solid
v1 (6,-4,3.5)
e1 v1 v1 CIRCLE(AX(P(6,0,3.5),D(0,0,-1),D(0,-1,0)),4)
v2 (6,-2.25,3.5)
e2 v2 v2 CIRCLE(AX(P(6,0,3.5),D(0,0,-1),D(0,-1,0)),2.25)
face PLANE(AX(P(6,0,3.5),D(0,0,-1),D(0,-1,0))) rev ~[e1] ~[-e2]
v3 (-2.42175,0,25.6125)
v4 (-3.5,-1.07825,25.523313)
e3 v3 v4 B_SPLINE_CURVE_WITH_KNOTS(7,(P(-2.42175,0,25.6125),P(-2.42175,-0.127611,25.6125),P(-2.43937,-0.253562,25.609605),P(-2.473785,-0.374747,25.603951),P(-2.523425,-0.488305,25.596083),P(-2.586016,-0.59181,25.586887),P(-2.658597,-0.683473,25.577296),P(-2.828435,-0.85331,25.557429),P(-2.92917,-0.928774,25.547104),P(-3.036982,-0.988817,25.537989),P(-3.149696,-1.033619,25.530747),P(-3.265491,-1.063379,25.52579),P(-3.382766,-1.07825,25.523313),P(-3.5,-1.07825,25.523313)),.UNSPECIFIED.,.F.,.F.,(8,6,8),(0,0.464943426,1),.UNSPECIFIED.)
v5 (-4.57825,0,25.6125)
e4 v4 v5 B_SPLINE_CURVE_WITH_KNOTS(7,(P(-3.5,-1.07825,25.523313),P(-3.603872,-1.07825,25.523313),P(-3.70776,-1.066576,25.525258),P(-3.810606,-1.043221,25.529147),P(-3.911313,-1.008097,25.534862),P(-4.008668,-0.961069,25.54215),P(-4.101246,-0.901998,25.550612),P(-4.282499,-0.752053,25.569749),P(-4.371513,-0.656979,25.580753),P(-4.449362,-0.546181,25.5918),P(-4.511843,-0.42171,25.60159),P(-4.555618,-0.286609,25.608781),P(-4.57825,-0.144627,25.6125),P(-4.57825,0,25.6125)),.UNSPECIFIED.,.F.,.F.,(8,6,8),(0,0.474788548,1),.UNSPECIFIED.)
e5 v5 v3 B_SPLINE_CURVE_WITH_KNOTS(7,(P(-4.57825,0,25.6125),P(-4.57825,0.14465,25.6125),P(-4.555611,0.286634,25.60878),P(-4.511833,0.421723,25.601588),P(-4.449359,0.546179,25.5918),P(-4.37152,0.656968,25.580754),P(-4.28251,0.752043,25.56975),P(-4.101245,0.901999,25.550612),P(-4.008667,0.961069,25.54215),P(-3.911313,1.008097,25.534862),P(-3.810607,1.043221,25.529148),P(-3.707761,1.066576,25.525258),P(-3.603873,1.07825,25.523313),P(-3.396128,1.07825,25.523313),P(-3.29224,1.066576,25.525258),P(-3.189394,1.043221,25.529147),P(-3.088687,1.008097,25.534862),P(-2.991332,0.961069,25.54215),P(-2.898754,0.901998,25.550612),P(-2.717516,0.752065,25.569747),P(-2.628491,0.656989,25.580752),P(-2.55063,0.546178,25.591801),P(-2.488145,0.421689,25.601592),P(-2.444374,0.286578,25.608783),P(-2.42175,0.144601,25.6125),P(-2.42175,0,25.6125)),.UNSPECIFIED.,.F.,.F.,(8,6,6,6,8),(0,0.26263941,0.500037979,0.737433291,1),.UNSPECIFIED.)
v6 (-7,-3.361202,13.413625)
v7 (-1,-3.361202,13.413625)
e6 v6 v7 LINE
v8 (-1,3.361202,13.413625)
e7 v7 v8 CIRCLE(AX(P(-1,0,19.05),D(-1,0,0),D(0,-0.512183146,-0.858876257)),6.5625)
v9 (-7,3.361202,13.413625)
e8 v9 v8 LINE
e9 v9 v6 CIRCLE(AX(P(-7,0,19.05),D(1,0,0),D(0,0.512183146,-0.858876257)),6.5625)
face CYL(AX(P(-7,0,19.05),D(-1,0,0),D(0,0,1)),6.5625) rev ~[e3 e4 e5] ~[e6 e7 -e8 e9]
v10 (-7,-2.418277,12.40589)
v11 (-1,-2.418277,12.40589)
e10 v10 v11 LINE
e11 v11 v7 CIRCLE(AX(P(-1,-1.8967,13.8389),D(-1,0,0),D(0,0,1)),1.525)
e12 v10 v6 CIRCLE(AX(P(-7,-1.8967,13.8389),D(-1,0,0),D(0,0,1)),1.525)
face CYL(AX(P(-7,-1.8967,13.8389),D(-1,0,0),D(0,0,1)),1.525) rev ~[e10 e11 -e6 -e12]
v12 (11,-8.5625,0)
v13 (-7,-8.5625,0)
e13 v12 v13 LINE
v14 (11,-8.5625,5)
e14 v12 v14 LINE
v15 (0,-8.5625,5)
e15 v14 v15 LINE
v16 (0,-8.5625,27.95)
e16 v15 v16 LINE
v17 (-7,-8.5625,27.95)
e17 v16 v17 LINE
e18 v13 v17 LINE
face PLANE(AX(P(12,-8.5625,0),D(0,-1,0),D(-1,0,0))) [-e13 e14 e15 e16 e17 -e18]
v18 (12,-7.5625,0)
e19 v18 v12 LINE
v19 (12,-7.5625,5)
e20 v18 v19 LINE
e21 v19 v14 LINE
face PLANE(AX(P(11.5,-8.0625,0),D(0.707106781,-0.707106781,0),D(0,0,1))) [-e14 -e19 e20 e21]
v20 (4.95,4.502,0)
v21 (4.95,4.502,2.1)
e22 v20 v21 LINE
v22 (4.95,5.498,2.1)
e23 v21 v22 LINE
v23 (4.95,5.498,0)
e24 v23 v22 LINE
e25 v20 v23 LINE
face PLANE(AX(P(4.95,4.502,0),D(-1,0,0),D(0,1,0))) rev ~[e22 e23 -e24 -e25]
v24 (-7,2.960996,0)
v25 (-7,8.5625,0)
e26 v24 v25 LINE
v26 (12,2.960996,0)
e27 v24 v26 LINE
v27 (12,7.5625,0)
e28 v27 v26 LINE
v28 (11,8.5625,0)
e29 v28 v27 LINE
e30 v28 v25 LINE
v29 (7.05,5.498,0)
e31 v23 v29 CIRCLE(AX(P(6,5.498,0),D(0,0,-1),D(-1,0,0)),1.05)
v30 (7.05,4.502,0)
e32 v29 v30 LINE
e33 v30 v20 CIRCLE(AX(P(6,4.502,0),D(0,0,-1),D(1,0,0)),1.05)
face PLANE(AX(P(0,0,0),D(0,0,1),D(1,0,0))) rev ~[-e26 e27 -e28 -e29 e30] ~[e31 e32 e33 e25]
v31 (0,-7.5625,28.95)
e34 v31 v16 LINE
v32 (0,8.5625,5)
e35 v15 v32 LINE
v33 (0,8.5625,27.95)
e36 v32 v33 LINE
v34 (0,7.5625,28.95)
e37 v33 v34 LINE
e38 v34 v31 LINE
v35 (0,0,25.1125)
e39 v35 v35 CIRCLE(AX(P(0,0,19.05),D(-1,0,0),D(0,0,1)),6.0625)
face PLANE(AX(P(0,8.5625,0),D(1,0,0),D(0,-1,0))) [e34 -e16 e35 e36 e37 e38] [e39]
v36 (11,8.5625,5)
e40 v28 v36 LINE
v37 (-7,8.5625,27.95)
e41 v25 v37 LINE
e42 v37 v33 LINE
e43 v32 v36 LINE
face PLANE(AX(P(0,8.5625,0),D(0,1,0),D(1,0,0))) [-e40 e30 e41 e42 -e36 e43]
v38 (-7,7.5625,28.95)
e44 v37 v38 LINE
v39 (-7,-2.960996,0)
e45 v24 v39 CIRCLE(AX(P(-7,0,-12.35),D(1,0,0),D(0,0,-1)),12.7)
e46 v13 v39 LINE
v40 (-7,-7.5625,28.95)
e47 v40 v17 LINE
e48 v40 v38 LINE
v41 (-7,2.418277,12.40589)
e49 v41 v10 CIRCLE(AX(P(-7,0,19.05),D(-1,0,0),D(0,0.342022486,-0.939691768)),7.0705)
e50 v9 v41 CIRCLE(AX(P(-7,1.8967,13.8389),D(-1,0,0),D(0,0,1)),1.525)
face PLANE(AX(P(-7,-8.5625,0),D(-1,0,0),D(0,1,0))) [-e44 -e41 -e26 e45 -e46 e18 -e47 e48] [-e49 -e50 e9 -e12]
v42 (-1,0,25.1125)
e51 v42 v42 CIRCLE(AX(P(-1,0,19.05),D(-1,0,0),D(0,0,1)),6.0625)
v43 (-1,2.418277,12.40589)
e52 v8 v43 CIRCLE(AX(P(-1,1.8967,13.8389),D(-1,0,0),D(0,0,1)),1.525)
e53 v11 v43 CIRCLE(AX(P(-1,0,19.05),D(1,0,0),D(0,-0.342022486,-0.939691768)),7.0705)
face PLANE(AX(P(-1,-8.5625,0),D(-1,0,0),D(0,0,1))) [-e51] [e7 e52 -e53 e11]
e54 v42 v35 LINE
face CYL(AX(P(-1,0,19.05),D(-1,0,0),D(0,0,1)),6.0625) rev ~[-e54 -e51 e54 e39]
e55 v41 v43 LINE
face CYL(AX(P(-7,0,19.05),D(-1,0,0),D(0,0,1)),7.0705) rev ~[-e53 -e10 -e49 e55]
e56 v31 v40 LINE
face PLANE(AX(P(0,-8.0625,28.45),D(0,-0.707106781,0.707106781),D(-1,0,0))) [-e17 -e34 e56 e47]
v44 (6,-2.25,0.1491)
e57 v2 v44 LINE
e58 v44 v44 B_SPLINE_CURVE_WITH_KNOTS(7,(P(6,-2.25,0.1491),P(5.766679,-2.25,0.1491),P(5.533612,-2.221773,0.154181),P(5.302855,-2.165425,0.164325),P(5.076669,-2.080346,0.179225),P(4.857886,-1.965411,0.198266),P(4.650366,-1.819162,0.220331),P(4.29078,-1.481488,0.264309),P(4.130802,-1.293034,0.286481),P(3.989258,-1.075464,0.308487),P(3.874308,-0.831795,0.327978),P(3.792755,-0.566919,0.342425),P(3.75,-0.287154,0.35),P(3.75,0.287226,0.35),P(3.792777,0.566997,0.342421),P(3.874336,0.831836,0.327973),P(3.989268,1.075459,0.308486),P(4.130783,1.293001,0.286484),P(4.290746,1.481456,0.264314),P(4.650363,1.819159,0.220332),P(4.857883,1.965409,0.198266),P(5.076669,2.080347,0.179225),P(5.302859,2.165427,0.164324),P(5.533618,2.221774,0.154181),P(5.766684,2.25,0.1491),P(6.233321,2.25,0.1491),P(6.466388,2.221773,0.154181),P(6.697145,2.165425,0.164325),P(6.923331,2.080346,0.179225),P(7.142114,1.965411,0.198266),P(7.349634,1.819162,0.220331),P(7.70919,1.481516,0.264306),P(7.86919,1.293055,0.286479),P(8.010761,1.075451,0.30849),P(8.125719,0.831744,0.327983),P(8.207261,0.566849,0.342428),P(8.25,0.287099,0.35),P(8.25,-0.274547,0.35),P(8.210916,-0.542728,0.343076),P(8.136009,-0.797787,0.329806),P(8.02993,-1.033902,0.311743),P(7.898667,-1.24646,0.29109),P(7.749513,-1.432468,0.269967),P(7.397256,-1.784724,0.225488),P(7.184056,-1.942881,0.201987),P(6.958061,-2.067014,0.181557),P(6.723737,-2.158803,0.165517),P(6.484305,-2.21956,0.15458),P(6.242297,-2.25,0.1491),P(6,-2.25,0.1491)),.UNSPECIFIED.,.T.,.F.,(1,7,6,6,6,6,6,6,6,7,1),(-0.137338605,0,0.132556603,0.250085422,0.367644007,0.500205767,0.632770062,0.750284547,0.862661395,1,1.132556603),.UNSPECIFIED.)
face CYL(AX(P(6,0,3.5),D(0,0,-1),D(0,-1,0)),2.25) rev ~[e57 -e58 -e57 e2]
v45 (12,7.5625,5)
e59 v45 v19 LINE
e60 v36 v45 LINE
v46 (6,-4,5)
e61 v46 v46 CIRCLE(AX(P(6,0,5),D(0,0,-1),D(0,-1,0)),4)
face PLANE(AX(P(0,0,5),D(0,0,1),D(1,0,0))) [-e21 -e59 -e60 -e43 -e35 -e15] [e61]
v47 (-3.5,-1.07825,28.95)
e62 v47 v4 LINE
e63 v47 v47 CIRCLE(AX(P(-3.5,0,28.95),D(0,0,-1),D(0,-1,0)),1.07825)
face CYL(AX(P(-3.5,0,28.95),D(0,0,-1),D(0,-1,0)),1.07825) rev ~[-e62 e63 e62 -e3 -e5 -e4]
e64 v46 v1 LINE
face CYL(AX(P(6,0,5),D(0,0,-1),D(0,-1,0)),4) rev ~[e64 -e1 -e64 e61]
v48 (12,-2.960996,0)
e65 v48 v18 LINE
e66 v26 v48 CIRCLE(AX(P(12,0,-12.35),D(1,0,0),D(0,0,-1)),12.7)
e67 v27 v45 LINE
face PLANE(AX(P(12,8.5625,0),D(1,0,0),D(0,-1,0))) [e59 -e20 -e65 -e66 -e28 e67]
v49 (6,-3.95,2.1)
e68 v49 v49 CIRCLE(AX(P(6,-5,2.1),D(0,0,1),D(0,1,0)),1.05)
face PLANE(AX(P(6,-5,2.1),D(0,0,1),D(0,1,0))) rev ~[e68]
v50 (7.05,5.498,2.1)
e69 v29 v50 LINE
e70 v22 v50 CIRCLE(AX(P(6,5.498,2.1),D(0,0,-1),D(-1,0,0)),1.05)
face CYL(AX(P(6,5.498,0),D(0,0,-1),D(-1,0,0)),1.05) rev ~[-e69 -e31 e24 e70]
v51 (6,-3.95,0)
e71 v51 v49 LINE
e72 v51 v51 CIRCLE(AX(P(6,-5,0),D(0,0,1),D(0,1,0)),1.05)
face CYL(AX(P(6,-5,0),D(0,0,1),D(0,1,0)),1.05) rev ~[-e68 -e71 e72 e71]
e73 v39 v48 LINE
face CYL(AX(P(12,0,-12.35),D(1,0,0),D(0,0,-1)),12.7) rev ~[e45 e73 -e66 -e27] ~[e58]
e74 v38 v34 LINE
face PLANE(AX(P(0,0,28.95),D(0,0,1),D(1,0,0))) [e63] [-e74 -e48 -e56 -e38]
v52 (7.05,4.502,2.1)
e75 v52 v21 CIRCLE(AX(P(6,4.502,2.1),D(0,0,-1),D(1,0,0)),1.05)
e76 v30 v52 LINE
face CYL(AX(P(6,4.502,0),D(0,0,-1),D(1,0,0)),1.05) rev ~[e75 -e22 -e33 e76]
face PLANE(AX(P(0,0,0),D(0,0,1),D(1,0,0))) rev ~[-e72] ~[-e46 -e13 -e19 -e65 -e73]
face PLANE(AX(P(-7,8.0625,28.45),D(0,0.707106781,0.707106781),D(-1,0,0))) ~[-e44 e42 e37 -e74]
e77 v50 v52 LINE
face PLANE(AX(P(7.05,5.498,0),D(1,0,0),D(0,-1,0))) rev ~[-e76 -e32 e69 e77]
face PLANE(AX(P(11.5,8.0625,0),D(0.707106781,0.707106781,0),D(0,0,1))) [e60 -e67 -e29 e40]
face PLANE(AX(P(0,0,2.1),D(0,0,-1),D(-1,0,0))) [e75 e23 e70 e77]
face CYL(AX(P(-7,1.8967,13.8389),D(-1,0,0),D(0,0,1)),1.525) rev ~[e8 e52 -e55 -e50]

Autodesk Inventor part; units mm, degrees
ref_plane "YZ Plane" through (0, 0, 0) normal (1, 0, 0) x (0, 1, 0)
ref_plane "XZ Plane" through (0, 0, 0) normal (0, 1, 0) x (-1, 0, 0)
ref_plane "XY Plane" through (0, 0, 0) normal (0, 0, 1) x (1, 0, 0)
sketch "Sketch1" plane through (0, 0, 0) normal (0, 0, 1) x (1, 0, 0)
  line L0 (-7, 8.5625) -> (0, 8.5625)
  line L1 (0, 8.5625) -> (0, -8.5625)
  line L2 (0, -8.5625) -> (-7, -8.5625)
  line L3 (-7, -8.5625) -> (-7, 8.5625)
  point P0 (0, 0)
  dimension "d0" = 0
  dimension "FRONT_LENGTH" = 7
  dimension "WIDTH" = 17.125
  dimension "d3" = 8.5625
extrude "Extrusion1" add sketch "Sketch1" along normal blind 28.95
sketch "Sketch2" plane through (0, 0, 0) normal (0, 0, 1) x (1, 0, 0)
  line L0 (0, -8.5625) -> (0, 8.5625) projected
  line L1 (0, 8.5625) -> (12, 8.5625)
  line L2 (12, 8.5625) -> (12, -8.5625)
  line L3 (12, -8.5625) -> (0, -8.5625)
  line L4 (0, -8.5625) -> (0, 8.5625)
  point P0 (0, 0)
  point P1 (0, -8.5625)
  dimension "d6" = 17.125
  dimension "BACK_LENGTH" = 12
sketch "Sketch3" plane through (-7, -8.5625, 0) normal (-1, 0, 0) x (0, 0, 1)
  circle A0 centre (19.05, 8.5625) radius 6.5625
  circle A1 centre (19.05, 8.5625) radius 7.0705
  circle A2 centre (13.8389, 10.4592) radius 1.525
  circle A3 centre (13.8389, 6.6658) radius 1.525
  line L0 (13.8389, 10.4592) -> (19.05, 8.5625)
  line L1 (19.05, 8.5625) -> (13.8389, 6.6658)
  line L2 (19.05, 8.5625) -> (0, 8.5625)
  point P0 (12.4059, 6.1442)
  point P1 (13.4136, 5.2013)
  point P2 (13.4136, 11.9237)
  point P3 (12.4059, 10.9808)
  dimension "d8" = 0
  dimension "MIRROR_HOLE" = 13.125
  dimension "d10" = 14.141
  dimension "d11" = 3.05
  dimension "d12" = 3.05
  dimension "d13" = 19.05
  dimension "d14" = 20
  dimension "d15" = 20
  dimension "d16" = 0
  dimension "d17" = 0
extrude "Extrusion2" cut sketch "Sketch3" against normal blind 6 contours A0 A3 L1 L0 A2 | A2 A0 | A0 A2 | A3 A0 | A0 A3 | A2 L0 L2 A0 | A0 L2 A1 A2 | A3 A1 L2 A0 | A0 L2 L1 A3
sketch "Sketch5" plane through (-1, -8.5625, 0) normal (-1, 0, 0) x (0, 0, 1)
  circle A0 centre (19.05, 8.5625) radius 6.0625
  point P0 (0, 8.5625)
  dimension "d20" = 0
  dimension "d21" = 19.05
  dimension "d22" = 12.125
extrude "Extrusion3" cut sketch "Sketch5" against normal up to surface (1 mm away)
extrude "Extrusion4" add sketch "Sketch2" along normal blind 5
sketch "Sketch6" plane through (0, 0, 5) normal (0, 0, 1) x (1, 0, 0)
  point P0 (0, 0)
  point P1 (6, 0)
  dimension "d27" = 0
  dimension "d28" = 6
hole "Hole1" at (6, 0, 5) direction (0, 0, -1) diameter 4.5 depth 5 counterbore diameter 8 counterbore depth 1.5 clearance for "Socket Head Cap Screw" size "#8" standard "Ansi Unified Screw Threads"
sketch "Sketch7" plane through (0, 0, 0) normal (0, 0, -1) x (-1, 0, 0)
  circle A0 centre (-6, 0) radius 2.25 projected
  line L0 (-6, 5.498) -> (-6, 4.502) construction
  line L1 (-7.05, 5.498) -> (-7.05, 4.502)
  line L2 (-4.95, 4.502) -> (-4.95, 5.498)
  arc A1 (-4.95, 5.498) -> (-7.05, 5.498) centre (-6, 5.498) ccw
  arc A2 (-7.05, 4.502) -> (-4.95, 4.502) centre (-6, 4.502) ccw
  point P0 (0, 0)
  point P1 (-6, -5)
  point P2 (-6, 5)
  dimension "d36" = 0
  dimension "d37" = 0
  dimension "d38" = 5
  dimension "d39" = 5
  dimension "d63" = 1.05
  dimension "d64" = 0.996
hole "Hole2" at (6, -5, 0) direction (0, 0, 1) diameter 2.1 depth 2.1
sketch "Sketch8" plane through (0, 0, 28.95) normal (0, 0, 1) x (1, 0, 0)
  point P0 (0, 0)
  point P1 (-3.5, 0)
  dimension "d47" = 3.5
  dimension "d48" = 0
hole "Hole4" at (-3.5, 0, 28.95) direction (0, 0, -1) diameter 2.1565 end up to surface thread size "4-40 UNC" class "3B" standard "ANSI Unified Screw Threads"
extrude "Extrusion5" cut sketch "Sketch7" against normal blind 2.1 contours A1 L2 A2 L1
chamfer "Chamfer1" distance 1 angle 45 4 edges at (-3.5, -8.5625, 28.95) (-3.5, 8.5625, 28.95) (12, -8.5625, 2.5) (12, 8.5625, 2.5)
sketch "Sketch9" plane through (12, -7.5625, 0) normal (1, 0, 0) x (0, 0, -1)
  circle A0 centre (12.35, 7.5625) radius 12.7
  point P0 (0, 7.5625)
  dimension "d70" = 0
  dimension "d71" = 25.4
  dimension "d72" = 12.35
extrude "Extrusion6" cut sketch "Sketch9" against normal up to surface (19 mm away)
equation "\"WIDTH\" = MIRROR_HOLE + 2 * MIN_WALL_THICKNESS"
equation "\"d3\" = 0.5 * WIDTH"
equation "\"d13\" = BEAM_HEIGHT"
equation "\"d6\" = WIDTH"
equation "\"d21\" = BEAM_HEIGHT"
equation "\"d28\" = 0.5 * BACK_LENGTH"
equation "\"d39\" = d38"
equation "\"d47\" = 0.5 * FRONT_LENGTH"
equation "\"BEAM_HEIGHT\" = 19.05"
equation "\"MIN_WALL_THICKNESS\" = 2"
equation "\"OPTICS_DIAMETER\" = 12.7"
equation "\"TOLERANCE\" = 0.05"
properties part number "ADAPTER_fixed-mirror-BH19.05-D12.7"
